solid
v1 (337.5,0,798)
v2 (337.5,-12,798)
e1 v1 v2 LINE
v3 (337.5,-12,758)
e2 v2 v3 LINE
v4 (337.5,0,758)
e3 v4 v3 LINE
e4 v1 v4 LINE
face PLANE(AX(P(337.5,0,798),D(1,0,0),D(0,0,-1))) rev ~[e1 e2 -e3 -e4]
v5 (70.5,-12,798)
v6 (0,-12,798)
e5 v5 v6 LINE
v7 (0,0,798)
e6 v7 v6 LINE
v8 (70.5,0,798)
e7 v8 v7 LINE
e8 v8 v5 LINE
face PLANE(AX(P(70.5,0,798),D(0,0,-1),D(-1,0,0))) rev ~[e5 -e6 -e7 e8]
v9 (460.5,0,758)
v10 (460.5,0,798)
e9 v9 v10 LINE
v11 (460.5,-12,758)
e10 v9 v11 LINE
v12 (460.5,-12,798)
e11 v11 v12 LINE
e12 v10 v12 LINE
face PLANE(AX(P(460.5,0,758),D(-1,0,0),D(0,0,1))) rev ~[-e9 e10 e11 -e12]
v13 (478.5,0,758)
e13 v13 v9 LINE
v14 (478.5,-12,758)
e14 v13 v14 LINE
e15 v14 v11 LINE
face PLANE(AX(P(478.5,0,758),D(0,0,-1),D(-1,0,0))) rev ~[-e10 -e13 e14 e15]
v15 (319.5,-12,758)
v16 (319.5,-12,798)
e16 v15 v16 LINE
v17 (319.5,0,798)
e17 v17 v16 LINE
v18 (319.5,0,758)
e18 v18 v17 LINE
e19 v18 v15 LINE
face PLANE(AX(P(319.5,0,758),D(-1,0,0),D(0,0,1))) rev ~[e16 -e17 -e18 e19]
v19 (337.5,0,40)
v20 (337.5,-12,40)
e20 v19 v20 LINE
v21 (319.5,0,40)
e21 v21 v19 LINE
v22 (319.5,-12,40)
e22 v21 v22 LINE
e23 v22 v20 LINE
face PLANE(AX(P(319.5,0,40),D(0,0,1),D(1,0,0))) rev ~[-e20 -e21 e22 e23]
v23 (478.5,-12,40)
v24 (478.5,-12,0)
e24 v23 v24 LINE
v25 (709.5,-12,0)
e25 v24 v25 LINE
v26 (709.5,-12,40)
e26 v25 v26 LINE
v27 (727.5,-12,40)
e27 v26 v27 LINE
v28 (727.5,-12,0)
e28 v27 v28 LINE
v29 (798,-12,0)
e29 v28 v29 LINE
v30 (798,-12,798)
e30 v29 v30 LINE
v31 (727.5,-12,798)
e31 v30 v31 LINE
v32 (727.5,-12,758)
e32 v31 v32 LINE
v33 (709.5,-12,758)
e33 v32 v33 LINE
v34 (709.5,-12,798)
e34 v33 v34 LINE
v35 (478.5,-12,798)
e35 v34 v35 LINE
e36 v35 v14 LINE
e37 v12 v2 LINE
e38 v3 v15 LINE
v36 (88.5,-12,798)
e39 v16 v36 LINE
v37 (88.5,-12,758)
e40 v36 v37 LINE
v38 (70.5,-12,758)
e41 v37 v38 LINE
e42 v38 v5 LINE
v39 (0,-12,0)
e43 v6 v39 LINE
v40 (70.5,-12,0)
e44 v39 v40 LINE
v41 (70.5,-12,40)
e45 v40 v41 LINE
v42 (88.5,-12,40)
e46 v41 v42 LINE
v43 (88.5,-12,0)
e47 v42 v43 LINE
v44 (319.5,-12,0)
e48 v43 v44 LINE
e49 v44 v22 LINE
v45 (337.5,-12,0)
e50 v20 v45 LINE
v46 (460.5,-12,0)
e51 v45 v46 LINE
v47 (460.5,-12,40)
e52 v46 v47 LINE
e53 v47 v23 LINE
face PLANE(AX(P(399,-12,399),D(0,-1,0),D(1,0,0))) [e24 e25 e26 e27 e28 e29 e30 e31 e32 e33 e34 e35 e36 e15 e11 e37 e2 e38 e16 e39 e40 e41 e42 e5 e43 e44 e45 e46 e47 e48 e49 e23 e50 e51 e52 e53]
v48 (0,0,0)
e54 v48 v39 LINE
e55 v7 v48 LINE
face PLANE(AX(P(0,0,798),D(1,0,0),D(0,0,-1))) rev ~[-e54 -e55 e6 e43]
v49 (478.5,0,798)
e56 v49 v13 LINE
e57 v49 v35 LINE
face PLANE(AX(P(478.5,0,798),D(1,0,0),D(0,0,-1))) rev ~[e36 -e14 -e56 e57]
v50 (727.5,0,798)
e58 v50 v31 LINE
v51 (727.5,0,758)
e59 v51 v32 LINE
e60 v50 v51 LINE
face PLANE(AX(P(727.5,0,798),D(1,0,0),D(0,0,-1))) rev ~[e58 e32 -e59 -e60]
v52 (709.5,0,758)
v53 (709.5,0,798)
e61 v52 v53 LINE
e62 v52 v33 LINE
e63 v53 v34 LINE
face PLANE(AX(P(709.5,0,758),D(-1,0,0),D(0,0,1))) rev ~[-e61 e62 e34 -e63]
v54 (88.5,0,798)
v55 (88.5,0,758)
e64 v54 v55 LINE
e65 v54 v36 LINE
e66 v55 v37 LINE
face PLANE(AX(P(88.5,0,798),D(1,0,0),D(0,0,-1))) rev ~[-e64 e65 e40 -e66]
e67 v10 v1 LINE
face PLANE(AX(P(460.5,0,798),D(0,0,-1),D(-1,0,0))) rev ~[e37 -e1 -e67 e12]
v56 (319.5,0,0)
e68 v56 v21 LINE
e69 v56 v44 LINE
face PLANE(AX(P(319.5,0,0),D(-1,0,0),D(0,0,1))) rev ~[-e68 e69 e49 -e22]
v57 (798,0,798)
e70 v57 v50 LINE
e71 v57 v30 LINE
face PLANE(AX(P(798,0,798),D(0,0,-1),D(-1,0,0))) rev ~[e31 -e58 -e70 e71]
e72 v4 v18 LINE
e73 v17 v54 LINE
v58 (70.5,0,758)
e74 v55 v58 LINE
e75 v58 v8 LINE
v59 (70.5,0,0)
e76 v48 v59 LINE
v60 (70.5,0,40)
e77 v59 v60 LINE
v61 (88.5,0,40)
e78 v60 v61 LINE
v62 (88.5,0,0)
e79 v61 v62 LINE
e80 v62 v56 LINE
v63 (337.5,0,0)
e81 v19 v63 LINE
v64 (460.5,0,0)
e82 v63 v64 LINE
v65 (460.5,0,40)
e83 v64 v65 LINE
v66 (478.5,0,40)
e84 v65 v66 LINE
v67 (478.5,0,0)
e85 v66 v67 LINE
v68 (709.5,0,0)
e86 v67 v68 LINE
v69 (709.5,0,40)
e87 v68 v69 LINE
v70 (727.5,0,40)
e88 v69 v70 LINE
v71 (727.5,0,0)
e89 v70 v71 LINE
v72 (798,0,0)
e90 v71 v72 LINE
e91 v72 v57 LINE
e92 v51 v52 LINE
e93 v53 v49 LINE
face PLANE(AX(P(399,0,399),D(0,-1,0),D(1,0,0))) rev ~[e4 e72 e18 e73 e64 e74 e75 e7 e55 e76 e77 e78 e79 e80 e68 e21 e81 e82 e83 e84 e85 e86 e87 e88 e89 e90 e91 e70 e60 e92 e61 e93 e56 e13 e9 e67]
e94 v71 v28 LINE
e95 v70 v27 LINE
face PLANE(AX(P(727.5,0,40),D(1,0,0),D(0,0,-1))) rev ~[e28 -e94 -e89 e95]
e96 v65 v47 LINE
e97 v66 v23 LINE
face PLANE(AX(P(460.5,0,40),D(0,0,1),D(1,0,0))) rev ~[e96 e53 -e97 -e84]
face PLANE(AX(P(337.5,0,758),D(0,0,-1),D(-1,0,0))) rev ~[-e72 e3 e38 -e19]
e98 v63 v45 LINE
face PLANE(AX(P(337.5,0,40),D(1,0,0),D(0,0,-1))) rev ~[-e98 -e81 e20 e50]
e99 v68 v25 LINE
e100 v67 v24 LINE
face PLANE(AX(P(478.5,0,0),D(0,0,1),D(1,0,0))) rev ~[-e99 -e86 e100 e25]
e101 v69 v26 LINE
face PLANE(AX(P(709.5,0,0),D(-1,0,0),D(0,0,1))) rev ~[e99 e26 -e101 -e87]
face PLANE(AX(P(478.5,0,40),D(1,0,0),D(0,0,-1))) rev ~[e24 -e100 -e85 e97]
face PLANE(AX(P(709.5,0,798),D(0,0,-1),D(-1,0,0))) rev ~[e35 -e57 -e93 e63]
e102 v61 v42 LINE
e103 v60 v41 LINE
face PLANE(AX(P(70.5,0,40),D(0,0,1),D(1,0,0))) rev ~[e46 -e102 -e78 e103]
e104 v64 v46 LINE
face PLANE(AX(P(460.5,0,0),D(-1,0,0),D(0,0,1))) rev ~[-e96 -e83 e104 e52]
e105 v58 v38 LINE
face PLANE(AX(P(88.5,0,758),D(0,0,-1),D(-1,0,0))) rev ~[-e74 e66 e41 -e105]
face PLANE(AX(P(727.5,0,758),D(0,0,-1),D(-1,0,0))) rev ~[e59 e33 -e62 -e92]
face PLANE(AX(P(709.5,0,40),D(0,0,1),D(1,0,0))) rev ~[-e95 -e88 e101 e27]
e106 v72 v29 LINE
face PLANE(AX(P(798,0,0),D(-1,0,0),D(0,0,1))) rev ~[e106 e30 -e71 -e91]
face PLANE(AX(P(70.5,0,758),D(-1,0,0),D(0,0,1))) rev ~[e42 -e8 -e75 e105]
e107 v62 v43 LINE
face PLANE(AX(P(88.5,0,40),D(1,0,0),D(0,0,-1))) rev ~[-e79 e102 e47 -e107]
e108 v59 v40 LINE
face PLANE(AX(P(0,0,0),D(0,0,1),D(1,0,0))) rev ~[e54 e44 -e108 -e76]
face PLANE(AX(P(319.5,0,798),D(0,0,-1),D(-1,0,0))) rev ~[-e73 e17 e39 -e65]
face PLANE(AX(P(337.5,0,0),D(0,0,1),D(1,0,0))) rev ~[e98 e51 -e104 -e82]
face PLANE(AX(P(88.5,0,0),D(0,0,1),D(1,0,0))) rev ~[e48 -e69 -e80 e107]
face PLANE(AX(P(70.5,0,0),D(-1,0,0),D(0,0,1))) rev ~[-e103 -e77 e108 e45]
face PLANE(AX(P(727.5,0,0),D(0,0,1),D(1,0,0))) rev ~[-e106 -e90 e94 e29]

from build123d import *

# Parameters (mm, degrees)
F1_DEPTH = 12


# Not quite as in the source:
# - a feature names something its author has since deleted; it is built from what else it names


with BuildPart() as f1:
    # F0 (on Front) → F1 (new body)
    with BuildSketch(Plane.XZ):
        Polygon((0, 798), (0, 0), (70.5, 0), (70.5, 40), (88.5, 40), (88.5, 0), (319.5, 0), (319.5, 40), (337.5, 40), (337.5, 0), (460.5, 0), (460.5, 40), (478.5, 40), (478.5, 0), (709.5, 0), (709.5, 40), (727.5, 40), (727.5, 0), (798, 0), (798, 798), (727.5, 798), (727.5, 758), (709.5, 758), (709.5, 798), (478.5, 798), (478.5, 758), (460.5, 758), (460.5, 798), (337.5, 798), (337.5, 758), (319.5, 758), (319.5, 798), (88.5, 798), (88.5, 758), (70.5, 758), (70.5, 798), align=None)
    extrude(amount=F1_DEPTH)


solid = f1.part
